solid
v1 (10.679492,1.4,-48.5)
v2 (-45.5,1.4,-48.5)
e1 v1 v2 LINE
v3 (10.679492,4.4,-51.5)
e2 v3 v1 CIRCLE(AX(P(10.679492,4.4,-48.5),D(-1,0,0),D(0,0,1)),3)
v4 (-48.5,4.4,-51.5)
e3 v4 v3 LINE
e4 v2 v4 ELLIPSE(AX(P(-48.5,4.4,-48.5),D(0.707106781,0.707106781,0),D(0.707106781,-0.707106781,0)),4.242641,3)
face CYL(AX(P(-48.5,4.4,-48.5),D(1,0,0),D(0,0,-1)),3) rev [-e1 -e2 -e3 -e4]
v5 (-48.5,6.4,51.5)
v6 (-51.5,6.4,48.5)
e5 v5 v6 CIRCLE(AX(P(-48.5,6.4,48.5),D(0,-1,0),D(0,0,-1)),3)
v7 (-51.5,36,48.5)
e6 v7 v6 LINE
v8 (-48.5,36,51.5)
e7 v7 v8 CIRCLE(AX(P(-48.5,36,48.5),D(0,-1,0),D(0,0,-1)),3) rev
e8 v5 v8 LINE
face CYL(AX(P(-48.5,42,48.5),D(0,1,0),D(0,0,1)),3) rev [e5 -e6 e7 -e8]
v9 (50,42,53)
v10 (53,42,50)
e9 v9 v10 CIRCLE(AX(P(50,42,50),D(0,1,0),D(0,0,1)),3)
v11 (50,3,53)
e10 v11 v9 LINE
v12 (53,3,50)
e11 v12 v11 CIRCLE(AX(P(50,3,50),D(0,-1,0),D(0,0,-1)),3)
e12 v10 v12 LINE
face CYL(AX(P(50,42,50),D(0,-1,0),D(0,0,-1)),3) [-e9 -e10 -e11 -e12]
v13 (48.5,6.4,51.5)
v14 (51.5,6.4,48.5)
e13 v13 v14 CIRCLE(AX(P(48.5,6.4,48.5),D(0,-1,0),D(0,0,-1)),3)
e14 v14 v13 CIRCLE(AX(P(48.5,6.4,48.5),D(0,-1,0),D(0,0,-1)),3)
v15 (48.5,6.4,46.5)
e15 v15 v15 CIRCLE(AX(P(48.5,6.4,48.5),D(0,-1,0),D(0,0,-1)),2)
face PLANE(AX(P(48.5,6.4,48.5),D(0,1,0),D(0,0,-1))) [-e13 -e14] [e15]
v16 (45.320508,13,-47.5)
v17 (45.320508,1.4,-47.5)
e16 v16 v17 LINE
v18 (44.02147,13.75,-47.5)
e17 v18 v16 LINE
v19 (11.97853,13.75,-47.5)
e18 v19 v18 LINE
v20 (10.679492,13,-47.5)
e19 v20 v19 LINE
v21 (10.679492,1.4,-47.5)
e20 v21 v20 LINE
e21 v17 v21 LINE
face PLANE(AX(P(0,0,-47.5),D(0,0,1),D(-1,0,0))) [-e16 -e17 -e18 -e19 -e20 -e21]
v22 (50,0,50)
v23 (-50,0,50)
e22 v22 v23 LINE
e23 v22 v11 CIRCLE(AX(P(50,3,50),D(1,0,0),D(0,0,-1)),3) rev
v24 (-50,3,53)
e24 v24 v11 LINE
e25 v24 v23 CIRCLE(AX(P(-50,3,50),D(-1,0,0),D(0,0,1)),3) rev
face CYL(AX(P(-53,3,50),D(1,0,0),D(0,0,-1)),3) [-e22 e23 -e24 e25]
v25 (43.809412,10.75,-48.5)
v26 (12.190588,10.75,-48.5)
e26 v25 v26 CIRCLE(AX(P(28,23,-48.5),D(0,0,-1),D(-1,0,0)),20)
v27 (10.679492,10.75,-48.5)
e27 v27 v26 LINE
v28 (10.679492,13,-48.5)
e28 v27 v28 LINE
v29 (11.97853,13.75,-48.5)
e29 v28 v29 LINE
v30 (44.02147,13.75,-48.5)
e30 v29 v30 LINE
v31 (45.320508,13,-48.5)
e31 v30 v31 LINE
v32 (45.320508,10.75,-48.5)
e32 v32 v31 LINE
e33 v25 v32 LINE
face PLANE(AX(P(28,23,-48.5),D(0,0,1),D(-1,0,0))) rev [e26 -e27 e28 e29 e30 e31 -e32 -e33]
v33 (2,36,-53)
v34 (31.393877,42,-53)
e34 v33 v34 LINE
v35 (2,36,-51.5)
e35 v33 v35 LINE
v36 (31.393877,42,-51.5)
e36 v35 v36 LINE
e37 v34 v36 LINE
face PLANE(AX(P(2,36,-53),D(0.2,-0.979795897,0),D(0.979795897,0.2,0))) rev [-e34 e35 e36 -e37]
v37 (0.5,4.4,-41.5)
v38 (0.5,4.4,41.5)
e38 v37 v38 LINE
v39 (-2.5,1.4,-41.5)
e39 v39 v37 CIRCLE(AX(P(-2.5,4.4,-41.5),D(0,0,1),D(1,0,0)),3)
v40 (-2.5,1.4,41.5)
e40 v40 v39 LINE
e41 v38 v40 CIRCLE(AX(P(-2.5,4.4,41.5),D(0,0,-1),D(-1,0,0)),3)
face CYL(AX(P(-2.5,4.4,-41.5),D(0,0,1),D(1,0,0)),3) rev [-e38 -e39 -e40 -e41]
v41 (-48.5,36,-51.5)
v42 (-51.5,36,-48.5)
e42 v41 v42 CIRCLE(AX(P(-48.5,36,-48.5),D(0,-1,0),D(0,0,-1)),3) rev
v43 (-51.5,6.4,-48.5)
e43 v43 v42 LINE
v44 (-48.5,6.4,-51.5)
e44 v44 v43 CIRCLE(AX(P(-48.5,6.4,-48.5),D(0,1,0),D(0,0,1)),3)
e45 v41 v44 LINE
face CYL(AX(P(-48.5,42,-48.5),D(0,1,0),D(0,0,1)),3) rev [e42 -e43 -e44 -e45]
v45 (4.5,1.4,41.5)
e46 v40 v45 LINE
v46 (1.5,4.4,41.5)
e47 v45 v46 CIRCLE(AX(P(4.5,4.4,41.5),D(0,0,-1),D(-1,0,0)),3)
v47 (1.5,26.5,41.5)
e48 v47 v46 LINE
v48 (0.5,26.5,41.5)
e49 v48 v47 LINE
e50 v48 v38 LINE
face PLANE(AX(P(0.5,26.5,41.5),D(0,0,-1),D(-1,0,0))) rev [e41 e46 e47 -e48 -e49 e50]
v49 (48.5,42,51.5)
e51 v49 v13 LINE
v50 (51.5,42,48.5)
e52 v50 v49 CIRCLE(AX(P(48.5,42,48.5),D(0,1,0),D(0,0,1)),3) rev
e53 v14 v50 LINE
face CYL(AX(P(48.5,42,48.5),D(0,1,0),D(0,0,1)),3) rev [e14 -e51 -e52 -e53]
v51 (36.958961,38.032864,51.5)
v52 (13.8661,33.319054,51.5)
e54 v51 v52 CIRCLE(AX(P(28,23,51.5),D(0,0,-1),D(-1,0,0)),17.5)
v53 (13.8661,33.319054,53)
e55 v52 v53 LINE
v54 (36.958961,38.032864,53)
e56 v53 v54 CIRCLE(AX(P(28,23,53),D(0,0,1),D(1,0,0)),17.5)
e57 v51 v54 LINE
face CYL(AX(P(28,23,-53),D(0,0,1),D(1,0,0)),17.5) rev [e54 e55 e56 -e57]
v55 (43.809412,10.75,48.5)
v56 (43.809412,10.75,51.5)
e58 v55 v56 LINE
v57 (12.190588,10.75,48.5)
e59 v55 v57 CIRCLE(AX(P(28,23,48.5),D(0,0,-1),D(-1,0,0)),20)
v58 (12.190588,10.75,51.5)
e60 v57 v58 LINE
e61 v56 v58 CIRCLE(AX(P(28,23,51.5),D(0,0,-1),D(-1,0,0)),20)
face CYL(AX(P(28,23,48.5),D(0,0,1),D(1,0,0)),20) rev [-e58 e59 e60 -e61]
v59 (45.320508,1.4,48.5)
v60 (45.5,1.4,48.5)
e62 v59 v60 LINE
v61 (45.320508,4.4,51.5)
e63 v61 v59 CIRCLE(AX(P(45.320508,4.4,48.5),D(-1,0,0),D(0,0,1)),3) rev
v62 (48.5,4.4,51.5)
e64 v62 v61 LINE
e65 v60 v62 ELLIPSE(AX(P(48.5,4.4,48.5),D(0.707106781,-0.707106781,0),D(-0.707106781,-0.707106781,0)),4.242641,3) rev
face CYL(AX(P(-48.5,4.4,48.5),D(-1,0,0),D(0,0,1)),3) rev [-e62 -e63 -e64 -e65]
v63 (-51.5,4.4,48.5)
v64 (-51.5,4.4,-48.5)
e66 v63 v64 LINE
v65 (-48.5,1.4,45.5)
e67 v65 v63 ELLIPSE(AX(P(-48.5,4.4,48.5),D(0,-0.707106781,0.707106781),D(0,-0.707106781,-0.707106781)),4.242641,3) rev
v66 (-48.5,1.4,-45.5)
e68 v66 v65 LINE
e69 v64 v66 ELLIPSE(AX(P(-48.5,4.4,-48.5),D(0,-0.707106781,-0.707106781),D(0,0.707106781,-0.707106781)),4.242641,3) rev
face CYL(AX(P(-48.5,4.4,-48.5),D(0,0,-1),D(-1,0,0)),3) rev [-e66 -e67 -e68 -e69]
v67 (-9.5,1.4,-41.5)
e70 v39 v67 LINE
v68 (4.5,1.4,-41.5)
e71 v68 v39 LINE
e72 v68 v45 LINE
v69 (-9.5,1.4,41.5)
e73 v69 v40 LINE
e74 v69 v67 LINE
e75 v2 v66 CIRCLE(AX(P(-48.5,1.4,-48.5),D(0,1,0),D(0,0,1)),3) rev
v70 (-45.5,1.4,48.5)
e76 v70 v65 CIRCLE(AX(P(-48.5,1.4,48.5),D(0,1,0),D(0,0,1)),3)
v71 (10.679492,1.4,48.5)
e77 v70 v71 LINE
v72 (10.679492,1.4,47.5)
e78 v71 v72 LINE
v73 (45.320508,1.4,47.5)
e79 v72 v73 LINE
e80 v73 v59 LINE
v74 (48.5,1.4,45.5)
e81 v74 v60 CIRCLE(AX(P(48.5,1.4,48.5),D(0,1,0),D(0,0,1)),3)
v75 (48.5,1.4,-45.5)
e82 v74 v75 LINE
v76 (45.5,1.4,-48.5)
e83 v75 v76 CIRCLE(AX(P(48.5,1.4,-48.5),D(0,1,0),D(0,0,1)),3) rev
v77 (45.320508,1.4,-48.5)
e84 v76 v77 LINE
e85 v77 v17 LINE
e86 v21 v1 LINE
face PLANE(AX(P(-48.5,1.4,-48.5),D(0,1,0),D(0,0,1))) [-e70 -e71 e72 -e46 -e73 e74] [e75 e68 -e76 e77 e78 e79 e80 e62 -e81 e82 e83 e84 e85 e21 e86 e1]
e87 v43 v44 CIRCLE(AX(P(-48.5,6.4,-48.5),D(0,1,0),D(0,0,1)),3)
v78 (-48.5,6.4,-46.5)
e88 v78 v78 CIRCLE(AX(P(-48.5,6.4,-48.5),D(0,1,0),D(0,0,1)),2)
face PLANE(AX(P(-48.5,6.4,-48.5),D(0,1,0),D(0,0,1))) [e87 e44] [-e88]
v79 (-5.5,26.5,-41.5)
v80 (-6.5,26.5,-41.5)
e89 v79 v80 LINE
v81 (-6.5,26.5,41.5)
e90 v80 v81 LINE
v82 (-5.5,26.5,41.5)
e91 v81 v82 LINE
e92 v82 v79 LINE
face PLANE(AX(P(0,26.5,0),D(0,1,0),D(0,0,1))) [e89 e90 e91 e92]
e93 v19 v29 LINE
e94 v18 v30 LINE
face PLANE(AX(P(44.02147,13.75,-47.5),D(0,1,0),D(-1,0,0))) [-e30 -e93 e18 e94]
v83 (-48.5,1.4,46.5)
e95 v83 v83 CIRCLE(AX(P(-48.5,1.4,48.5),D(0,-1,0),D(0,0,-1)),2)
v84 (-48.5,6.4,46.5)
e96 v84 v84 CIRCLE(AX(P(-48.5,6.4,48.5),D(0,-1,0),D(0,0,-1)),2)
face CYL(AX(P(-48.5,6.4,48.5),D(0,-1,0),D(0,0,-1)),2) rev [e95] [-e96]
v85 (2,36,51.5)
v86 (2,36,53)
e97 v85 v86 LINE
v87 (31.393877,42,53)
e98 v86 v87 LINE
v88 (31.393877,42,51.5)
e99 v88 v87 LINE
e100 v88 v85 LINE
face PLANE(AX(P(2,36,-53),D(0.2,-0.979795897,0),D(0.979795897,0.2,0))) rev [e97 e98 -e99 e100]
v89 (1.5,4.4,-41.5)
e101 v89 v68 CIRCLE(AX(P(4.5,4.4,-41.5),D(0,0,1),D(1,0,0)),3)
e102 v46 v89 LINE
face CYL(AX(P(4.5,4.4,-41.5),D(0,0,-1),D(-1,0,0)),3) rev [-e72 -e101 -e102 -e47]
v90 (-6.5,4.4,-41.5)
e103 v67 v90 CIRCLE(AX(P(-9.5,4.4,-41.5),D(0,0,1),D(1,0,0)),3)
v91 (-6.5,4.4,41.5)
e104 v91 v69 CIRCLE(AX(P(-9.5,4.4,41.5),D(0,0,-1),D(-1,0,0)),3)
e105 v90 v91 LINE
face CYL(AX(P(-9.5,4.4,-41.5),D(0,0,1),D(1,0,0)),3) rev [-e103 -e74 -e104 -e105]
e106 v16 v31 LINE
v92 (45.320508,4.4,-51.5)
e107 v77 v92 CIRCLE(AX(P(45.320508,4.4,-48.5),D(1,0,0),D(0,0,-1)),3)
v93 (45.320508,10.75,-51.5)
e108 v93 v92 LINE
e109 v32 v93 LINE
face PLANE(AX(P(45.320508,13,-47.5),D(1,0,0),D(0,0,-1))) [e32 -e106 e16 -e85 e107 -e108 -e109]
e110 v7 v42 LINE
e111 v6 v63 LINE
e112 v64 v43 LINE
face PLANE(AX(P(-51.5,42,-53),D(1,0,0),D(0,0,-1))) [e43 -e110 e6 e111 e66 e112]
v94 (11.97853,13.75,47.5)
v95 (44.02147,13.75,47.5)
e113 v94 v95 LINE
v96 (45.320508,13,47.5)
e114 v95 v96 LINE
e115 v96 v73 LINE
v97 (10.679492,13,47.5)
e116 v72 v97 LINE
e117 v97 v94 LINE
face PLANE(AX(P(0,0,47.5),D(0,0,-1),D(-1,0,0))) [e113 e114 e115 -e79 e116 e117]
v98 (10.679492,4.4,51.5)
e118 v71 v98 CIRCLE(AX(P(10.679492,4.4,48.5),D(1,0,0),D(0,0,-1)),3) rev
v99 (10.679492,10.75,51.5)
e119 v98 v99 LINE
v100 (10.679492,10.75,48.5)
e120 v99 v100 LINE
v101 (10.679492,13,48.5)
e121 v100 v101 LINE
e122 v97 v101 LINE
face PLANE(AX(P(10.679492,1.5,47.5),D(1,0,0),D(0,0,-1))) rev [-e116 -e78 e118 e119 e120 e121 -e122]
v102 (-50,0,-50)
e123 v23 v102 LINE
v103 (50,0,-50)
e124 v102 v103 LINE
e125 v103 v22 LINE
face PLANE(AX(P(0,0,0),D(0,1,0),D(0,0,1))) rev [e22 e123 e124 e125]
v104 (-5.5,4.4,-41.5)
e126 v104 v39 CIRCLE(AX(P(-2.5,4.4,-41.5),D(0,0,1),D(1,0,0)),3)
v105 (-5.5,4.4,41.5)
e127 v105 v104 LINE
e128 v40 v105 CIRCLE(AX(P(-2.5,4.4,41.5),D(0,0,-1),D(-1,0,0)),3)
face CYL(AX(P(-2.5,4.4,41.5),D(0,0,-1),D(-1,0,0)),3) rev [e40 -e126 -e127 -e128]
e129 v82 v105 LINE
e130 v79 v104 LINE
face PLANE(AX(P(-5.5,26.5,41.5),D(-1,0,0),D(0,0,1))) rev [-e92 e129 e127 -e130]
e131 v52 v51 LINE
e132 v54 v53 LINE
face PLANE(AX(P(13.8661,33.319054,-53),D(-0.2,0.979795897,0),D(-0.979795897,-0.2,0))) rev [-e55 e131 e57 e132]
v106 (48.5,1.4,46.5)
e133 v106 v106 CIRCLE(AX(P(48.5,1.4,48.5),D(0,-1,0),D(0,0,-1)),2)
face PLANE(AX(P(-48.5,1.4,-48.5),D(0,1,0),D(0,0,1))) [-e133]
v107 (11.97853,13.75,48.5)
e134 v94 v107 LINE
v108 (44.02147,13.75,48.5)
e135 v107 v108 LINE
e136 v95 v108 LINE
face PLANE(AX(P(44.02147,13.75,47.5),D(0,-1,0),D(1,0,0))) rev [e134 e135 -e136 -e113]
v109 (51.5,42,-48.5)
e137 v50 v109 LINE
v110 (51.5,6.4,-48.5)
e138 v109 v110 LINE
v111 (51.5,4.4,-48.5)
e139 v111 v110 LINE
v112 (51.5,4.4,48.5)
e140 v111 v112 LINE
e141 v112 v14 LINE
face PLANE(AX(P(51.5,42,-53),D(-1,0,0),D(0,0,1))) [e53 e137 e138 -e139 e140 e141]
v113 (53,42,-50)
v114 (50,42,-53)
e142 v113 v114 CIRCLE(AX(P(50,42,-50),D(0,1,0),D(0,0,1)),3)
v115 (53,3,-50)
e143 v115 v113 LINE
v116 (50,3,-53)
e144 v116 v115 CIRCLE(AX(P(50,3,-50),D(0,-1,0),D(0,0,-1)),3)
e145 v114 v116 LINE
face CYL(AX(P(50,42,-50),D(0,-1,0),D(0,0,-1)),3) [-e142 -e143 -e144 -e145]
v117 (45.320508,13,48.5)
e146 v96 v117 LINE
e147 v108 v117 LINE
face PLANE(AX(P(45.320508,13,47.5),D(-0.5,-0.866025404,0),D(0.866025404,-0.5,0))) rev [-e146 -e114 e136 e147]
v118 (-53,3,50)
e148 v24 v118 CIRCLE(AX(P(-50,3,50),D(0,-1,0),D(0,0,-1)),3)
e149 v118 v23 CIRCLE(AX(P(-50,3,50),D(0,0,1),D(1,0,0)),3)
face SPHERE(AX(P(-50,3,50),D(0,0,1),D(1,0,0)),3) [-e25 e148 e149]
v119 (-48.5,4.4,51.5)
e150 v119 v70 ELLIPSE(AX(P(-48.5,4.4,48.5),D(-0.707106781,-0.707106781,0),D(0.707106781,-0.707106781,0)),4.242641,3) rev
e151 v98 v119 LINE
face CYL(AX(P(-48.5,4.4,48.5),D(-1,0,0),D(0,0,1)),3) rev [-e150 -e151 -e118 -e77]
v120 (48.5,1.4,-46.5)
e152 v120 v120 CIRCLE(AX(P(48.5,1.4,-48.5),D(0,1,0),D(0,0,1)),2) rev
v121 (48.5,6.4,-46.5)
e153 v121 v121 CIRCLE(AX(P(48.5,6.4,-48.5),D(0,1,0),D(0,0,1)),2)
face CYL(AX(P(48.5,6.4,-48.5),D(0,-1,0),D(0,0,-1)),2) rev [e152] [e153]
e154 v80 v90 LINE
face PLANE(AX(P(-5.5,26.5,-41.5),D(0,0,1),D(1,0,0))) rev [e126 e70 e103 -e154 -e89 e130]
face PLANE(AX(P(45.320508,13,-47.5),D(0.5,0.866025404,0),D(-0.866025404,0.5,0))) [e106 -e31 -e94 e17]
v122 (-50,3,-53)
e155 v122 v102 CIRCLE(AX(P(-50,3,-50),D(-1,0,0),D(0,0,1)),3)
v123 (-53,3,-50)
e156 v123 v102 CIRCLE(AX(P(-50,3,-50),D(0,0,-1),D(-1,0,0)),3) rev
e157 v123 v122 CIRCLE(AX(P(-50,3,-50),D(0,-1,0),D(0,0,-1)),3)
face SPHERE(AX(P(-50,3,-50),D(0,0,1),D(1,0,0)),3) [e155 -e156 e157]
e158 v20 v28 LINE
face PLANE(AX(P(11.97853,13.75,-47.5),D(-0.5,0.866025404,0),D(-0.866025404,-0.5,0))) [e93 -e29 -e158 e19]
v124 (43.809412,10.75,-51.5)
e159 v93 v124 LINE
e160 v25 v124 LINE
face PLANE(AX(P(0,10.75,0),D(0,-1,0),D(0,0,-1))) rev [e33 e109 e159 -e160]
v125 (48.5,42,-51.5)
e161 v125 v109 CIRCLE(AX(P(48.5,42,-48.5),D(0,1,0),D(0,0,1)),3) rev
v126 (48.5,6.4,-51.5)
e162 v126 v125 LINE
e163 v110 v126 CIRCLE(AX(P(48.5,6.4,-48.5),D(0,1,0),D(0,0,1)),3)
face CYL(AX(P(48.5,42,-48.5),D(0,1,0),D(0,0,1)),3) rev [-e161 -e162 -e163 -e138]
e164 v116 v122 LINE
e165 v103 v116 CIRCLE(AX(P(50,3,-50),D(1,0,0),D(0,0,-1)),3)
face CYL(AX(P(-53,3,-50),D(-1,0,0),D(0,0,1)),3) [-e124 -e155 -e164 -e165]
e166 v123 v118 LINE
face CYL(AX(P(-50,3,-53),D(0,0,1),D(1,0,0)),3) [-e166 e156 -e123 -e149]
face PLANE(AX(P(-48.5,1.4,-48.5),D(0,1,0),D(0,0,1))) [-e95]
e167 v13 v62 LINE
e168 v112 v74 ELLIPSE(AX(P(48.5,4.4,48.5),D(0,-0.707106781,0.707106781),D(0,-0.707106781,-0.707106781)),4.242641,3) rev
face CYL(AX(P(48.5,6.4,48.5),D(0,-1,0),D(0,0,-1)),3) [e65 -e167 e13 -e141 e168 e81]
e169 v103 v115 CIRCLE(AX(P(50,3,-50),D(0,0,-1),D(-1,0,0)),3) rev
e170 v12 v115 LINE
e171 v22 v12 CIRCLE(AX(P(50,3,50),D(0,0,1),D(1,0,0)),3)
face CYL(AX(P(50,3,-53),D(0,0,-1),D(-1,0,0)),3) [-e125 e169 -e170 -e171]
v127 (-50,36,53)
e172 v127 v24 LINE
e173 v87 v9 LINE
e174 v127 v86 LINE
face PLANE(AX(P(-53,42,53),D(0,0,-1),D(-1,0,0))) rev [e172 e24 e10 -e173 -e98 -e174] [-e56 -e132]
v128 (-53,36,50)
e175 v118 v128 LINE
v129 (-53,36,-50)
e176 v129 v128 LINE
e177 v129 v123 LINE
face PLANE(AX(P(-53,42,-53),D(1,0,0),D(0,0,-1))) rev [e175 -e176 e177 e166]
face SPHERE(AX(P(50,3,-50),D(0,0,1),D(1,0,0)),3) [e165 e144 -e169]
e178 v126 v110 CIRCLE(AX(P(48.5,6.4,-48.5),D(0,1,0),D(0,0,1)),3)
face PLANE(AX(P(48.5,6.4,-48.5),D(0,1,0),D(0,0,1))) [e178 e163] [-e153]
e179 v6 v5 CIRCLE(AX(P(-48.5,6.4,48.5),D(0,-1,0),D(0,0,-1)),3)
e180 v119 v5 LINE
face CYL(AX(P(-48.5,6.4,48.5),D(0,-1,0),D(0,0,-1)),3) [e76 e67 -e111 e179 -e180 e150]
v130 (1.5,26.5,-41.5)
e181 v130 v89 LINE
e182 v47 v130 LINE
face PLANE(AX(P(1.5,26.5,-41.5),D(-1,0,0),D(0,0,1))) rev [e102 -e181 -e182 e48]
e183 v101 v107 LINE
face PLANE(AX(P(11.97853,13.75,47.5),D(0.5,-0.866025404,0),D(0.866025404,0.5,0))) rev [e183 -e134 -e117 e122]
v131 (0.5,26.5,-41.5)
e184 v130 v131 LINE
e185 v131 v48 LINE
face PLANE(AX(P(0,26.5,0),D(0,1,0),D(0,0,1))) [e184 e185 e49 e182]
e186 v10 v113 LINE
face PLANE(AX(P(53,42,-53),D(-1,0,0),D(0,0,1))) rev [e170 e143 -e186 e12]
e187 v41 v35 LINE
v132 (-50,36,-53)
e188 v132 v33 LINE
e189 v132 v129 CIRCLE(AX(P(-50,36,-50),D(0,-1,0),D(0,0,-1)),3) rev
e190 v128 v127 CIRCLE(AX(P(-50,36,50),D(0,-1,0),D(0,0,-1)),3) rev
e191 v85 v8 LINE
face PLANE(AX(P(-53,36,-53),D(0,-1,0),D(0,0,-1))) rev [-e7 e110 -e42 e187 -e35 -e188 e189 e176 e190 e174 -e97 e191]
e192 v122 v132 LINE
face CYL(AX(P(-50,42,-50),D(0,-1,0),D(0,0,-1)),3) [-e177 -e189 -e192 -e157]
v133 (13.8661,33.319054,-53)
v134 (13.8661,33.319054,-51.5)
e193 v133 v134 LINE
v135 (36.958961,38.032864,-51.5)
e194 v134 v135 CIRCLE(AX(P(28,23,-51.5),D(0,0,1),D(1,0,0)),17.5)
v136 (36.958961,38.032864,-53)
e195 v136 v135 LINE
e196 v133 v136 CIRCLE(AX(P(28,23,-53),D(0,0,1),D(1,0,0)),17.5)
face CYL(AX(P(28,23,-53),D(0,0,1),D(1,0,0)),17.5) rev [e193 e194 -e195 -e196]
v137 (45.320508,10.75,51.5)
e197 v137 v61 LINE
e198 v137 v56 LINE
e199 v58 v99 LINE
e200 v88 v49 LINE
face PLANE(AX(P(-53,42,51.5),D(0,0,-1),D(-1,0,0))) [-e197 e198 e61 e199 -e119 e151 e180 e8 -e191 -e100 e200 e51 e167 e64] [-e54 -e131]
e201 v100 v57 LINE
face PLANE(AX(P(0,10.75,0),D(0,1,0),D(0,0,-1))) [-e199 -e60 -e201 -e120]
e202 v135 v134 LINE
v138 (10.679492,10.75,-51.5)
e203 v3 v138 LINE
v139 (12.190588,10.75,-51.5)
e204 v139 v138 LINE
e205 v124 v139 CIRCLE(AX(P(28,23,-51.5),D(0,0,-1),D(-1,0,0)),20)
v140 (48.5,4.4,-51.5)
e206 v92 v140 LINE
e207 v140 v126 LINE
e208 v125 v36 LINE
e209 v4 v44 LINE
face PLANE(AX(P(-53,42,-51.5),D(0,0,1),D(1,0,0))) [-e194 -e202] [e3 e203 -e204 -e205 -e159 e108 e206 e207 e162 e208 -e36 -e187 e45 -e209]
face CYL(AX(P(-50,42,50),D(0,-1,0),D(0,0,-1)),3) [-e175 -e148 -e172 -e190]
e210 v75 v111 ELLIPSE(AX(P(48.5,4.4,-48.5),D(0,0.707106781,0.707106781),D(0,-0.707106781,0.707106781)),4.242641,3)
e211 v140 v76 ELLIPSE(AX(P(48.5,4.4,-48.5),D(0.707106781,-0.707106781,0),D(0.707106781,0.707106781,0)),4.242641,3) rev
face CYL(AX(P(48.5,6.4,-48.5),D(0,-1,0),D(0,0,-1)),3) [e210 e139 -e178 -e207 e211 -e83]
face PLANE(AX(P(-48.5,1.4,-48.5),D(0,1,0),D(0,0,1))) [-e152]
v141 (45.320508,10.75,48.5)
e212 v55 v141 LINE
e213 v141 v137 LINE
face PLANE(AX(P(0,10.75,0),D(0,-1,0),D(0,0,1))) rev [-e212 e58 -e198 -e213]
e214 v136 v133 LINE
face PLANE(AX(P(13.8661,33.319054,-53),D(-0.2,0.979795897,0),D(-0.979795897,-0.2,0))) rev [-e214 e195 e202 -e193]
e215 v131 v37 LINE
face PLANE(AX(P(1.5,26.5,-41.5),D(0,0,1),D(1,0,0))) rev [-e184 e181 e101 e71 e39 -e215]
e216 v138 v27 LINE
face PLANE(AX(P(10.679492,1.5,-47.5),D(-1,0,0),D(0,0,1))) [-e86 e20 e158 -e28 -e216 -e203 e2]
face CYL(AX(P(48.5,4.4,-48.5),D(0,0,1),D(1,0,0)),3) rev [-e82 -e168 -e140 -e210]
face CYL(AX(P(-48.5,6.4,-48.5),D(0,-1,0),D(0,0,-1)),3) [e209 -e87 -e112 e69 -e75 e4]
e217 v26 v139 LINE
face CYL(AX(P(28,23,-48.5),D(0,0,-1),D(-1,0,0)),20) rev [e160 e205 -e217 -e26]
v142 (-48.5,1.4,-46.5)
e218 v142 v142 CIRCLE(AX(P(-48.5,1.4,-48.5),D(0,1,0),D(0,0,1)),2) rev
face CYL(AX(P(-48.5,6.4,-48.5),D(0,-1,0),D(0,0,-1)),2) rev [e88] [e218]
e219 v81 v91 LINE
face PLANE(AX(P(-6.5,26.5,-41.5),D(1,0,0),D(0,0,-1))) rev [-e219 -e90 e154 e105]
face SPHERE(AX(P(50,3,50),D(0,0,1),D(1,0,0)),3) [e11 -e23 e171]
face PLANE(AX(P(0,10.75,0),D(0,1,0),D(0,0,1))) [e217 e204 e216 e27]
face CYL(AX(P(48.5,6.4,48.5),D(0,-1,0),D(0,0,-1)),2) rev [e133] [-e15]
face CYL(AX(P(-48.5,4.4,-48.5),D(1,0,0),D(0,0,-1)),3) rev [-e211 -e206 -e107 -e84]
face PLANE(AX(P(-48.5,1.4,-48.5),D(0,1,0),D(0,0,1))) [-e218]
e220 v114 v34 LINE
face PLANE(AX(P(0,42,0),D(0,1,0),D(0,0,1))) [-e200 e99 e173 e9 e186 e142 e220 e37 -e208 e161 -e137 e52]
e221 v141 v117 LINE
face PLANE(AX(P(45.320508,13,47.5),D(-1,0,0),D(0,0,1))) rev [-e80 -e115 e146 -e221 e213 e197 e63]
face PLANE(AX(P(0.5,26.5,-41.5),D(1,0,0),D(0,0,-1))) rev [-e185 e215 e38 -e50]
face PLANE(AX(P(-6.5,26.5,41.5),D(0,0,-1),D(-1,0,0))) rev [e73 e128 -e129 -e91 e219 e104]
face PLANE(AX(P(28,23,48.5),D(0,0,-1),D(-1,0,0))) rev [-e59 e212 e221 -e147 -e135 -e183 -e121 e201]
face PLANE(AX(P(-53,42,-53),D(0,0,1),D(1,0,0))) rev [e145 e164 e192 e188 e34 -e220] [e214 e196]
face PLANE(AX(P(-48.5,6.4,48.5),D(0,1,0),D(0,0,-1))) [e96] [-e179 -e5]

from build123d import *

# Parameters (mm, degrees)
EXTRUDE_1_DEPTH      = 42
SHELL_1_T            = -1.5
EXTRUDE_4_DEPTH      = 25
FILLET_2_R           = 3
CUT_EXTRUDE_3_DEPTH  = 126.73384588089242
CUT_EXTRUDE_4_DEPTH  = 126.73384588089242
EXTRUDE_5_DEPTH      = 4
CUT_EXTRUDE_7_DEPTH  = 3
CUT_EXTRUDE_START    = -0.1
CUT_EXTRUDE_12_DEPTH = 0.1
SKETCH_18_R          = 3.0000000000000018
SKETCH_18_R_2        = 2.0000000000000036
EXTRUDE_6_DEPTH      = 5
FILLET_3_R           = 3
SKETCH_22_W          = 3
SKETCH_22_H          = 3.000000000000014
CUT_EXTRUDE_13_DEPTH = 3
SKETCH_23_W          = 3.000000000000007
SKETCH_23_H          = 3.000000000000014
CUT_EXTRUDE_14_DEPTH = 3
FILLET_4_R           = 3


with BuildPart() as part:
    # 草图1 → 凸台-拉伸1 (new body)
    with BuildSketch(Plane(origin=(0, 0, 0), x_dir=(1, 0, 0), z_dir=(0, 1, 0))):
        Polygon((-53.000000000000014, 53), (52.999999999999986, 53), (53, -53), (-53, -53), align=None)
    extrude(amount=EXTRUDE_1_DEPTH)

    # 抽壳1
    shell_1_openings = [part.faces().sort_by_distance(p)[0] for p in [
        (0, 42, 0),
    ]]
    offset(amount=SHELL_1_T, openings=shell_1_openings, kind=Kind.INTERSECTION)

    # 草图3 → 凸台-拉伸4 (add)
    with BuildSketch(Plane(origin=(0, 1.5, 0), x_dir=(1, 0, 0), z_dir=(0, 1, 0))):
        Polygon((-6.500000000000012, 41.49999999999999), (-6.500000000000003, -41.49999999999999), (-5.500000000000003, -41.49999999999999), (-5.5000000000000036, 41.49999999999999), align=None)
        Polygon((1.4999999999999944, 41.49999999999999), (1.5000000000000053, -41.49999999999999), (0.5000000000000043, -41.49999999999999), (0.4999999999999944, 41.49999999999999), align=None)
    extrude(amount=EXTRUDE_4_DEPTH)

    # 圆角2
    fillet_2_edges = [part.edges().sort_by_distance(p)[0] for p in [
        (51.5, 21.75, 51.5),
        (51.499999999999986, 21.75, -51.5),
        (-51.500000000000014, 21.75, -51.5),
        (-51.5, 21.75, 51.5),
        (0, 0, 53),
        (-53.00000000000001, 0, 0),
        (-1.421e-14, 0, -53),
        (52.99999999999999, 0, 0),
        (53, 21, 53),
        (-53, 21, 53),
        (-53.000000000000014, 21, -53),
        (52.999999999999986, 21, -53),
    ]]
    fillet(fillet_2_edges, radius=FILLET_2_R)

    # 草图6 → 切除-拉伸3 (cut, through all)
    with BuildSketch(Plane.XY.offset(53)):
        Polygon((-53, 36.00000000000001), (2.0000000000000018, 36.00000000000001), (31.393876913398135, 42), (-53, 42), align=None)
    extrude(amount=-CUT_EXTRUDE_3_DEPTH, mode=Mode.SUBTRACT)

    # 草图7 → 切除-拉伸4 (cut, through all)
    with BuildSketch(Plane.XY.offset(53)):
        with BuildLine():
            Line((13.866100098640908, 33.319053909073325), (36.958961236370065, 38.032864449771985))
            ThreePointArc((36.958961236370065, 38.032864449771985), (31.499999999999993, 5.853571800517756), (13.866100098640908, 33.319053909073325))
        make_face()
    extrude(amount=-CUT_EXTRUDE_4_DEPTH, mode=Mode.SUBTRACT)

    # 草图8 → 凸台-拉伸5 (add)
    with BuildSketch(Plane(origin=(0, 0, 51.5), x_dir=(-1, 0, 0), z_dir=(0, 0, -1))):
        Polygon((-45.32050807568879, 13.00000000000003), (-44.021469970012134, 13.750000000000028), (-11.978530029987853, 13.750000000000032), (-10.679491924311197, 13.000000000000034), (-10.679491924311197, 1.5000000000000053), (-45.32050807568879, 1.5000000000000009), align=None)
    extrude_5 = extrude(amount=EXTRUDE_5_DEPTH)

    # 草图10 → 切除-拉伸7 (cut)
    with BuildSketch(Plane(origin=(0, 0, 51.5), x_dir=(-1, 0, 0), z_dir=(0, 0, -1))):
        with BuildLine():
            Line((-45.3205080756888, 13.000000000000043), (-27.999999999999996, 23))
            Line((-27.999999999999996, 23), (-10.679491924311197, 13.000000000000043))
            ThreePointArc((-10.679491924311197, 13.000000000000043), (-28, 2.9999999999999964), (-45.3205080756888, 13.000000000000043))
        make_face()
    cut_extrude_7 = extrude(amount=CUT_EXTRUDE_7_DEPTH, mode=Mode.SUBTRACT)

    # 镜向1: 凸台-拉伸5, 切除-拉伸7 across plane
    add(extrude_5.mirror(Plane.XY))
    add(cut_extrude_7.mirror(Plane.XY), mode=Mode.SUBTRACT)

    # 草图17 → 切除-拉伸12 (cut)
    with BuildSketch(Plane(origin=(0, 1.5, 0), x_dir=(1, 0, 0), z_dir=(0, 1, 0)).offset(CUT_EXTRUDE_START)):
        with BuildLine():
            Line((10.679491924311197, 47.5), (10.679491924311197, 51.5))
            Line((10.679491924311197, 51.5), (-48.50000000000001, 51.5))
            ThreePointArc((-48.50000000000001, 51.5), (-50.62132034355965, 50.62132034355964), (-51.500000000000014, 48.49999999999999))
            Line((-51.500000000000014, 48.49999999999999), (-51.5, -48.49999999999999))
            ThreePointArc((-51.5, -48.49999999999999), (-50.62132034355964, -50.62132034355964), (-48.49999999999999, -51.5))
            Line((-48.49999999999999, -51.5), (10.679491924311197, -51.5))
            Line((10.679491924311197, -51.5), (10.679491924311197, -47.5))
            Line((10.679491924311197, -47.5), (45.32050807568879, -47.5))
            Line((45.32050807568879, -47.5), (45.32050807568879, -51.5))
            Line((45.32050807568879, -51.5), (48.49999999999999, -51.5))
            ThreePointArc((48.49999999999999, -51.5), (50.62132034355964, -50.62132034355964), (51.5, -48.49999999999999))
            Line((51.5, -48.49999999999999), (51.499999999999986, 48.49999999999999))
            ThreePointArc((51.499999999999986, 48.49999999999999), (50.621320343559624, 50.62132034355964), (48.49999999999998, 51.5))
            Line((48.49999999999998, 51.5), (45.32050807568879, 51.5))
            Line((45.32050807568879, 51.5), (45.32050807568879, 47.5))
            Line((45.32050807568879, 47.5), (10.679491924311197, 47.5))
        make_face()
        Polygon((1.4999999999999944, 41.49999999999999), (0.4999999999999944, 41.49999999999999), (0.5000000000000043, -41.49999999999999), (1.5000000000000053, -41.49999999999999), align=None, mode=Mode.SUBTRACT)
        Polygon((-5.5000000000000036, 41.49999999999999), (-6.500000000000012, 41.49999999999999), (-6.500000000000003, -41.49999999999999), (-5.500000000000003, -41.49999999999999), align=None, mode=Mode.SUBTRACT)
    extrude(amount=CUT_EXTRUDE_12_DEPTH, mode=Mode.SUBTRACT)

    # 草图18 → 凸台-拉伸6 (add)
    # profile 1 of 2: a face of its own
    with BuildSketch(Plane(origin=(0, 1.4, 0), x_dir=(1, 0, 0), z_dir=(0, 1, 0))):
        with Locations((-48.50000000000001, 48.49999999999999)):
            Circle(SKETCH_18_R)
        with Locations(Location((-48.50000000000001, 48.49999999999999, 0), (0, 0, 270))):
            Circle(SKETCH_18_R_2, mode=Mode.SUBTRACT)
    # profile 2 of 2: a face of its own
    with BuildSketch(Plane(origin=(0, 1.4, 0), x_dir=(1, 0, 0), z_dir=(0, 1, 0))):
        with Locations((48.49999999999998, 48.49999999999999)):
            Circle(SKETCH_18_R)
        with Locations(Location((48.49999999999998, 48.49999999999999, 0), (0, 0, 270))):
            Circle(SKETCH_18_R_2, mode=Mode.SUBTRACT)
    extrude_6 = extrude(amount=EXTRUDE_6_DEPTH)

    # 镜向2: 凸台-拉伸6 across plane
    add(extrude_6.mirror(Plane.XY))

    # 圆角3
    fillet_3_edges = [part.edges().sort_by_distance(p)[0] for p in [
        (46.91025403784438, 1.4, -51.5),
        (51.49999999999999, 1.4, 0),
        (46.910254037844396, 1.4, 51.5),
        (-18.910254037844396, 1.4, 51.5),
        (-51.50000000000001, 1.4, 0),
        (-18.910254037844407, 1.4, -51.5),
    ]]
    fillet(fillet_3_edges, radius=FILLET_3_R)

    # 草图22 → 切除-拉伸13 (cut)
    with BuildSketch(Plane(origin=(1.49e-15, 13.750000000000034, 0), x_dir=(1, -1.1e-16, 0), z_dir=(1.1e-16, 1, 0))):
        with Locations((12.179491924311202, 50)):
            Rectangle(SKETCH_22_W, SKETCH_22_H)
    cut_extrude_13 = extrude(amount=-CUT_EXTRUDE_13_DEPTH, mode=Mode.SUBTRACT)

    # 草图23 → 切除-拉伸14 (cut)
    with BuildSketch(Plane(origin=(1.49e-15, 13.750000000000034, 0), x_dir=(1, -1.1e-16, 0), z_dir=(1.1e-16, 1, 0))):
        with Locations((43.82050807568879, 50)):
            Rectangle(SKETCH_23_W, SKETCH_23_H)
    cut_extrude_14 = extrude(amount=-CUT_EXTRUDE_14_DEPTH, mode=Mode.SUBTRACT)

    # 镜向3: 切除-拉伸13, 切除-拉伸14 across plane
    add(cut_extrude_13.mirror(Plane.XY), mode=Mode.SUBTRACT)
    add(cut_extrude_14.mirror(Plane.XY), mode=Mode.SUBTRACT)

    # 圆角4
    fillet_4_edges = [part.edges().sort_by_distance(p)[0] for p in [
        (-5.5000000000000036, 1.4, 0),
        (-6.500000000000008, 1.4, 0),
        (1.5, 1.4, 0),
        (0.49999999999999933, 1.4, 0),
    ]]
    fillet(fillet_4_edges, radius=FILLET_4_R - 0.0001)  # a hair under: the kernel refuses the full size


solid = part.part
